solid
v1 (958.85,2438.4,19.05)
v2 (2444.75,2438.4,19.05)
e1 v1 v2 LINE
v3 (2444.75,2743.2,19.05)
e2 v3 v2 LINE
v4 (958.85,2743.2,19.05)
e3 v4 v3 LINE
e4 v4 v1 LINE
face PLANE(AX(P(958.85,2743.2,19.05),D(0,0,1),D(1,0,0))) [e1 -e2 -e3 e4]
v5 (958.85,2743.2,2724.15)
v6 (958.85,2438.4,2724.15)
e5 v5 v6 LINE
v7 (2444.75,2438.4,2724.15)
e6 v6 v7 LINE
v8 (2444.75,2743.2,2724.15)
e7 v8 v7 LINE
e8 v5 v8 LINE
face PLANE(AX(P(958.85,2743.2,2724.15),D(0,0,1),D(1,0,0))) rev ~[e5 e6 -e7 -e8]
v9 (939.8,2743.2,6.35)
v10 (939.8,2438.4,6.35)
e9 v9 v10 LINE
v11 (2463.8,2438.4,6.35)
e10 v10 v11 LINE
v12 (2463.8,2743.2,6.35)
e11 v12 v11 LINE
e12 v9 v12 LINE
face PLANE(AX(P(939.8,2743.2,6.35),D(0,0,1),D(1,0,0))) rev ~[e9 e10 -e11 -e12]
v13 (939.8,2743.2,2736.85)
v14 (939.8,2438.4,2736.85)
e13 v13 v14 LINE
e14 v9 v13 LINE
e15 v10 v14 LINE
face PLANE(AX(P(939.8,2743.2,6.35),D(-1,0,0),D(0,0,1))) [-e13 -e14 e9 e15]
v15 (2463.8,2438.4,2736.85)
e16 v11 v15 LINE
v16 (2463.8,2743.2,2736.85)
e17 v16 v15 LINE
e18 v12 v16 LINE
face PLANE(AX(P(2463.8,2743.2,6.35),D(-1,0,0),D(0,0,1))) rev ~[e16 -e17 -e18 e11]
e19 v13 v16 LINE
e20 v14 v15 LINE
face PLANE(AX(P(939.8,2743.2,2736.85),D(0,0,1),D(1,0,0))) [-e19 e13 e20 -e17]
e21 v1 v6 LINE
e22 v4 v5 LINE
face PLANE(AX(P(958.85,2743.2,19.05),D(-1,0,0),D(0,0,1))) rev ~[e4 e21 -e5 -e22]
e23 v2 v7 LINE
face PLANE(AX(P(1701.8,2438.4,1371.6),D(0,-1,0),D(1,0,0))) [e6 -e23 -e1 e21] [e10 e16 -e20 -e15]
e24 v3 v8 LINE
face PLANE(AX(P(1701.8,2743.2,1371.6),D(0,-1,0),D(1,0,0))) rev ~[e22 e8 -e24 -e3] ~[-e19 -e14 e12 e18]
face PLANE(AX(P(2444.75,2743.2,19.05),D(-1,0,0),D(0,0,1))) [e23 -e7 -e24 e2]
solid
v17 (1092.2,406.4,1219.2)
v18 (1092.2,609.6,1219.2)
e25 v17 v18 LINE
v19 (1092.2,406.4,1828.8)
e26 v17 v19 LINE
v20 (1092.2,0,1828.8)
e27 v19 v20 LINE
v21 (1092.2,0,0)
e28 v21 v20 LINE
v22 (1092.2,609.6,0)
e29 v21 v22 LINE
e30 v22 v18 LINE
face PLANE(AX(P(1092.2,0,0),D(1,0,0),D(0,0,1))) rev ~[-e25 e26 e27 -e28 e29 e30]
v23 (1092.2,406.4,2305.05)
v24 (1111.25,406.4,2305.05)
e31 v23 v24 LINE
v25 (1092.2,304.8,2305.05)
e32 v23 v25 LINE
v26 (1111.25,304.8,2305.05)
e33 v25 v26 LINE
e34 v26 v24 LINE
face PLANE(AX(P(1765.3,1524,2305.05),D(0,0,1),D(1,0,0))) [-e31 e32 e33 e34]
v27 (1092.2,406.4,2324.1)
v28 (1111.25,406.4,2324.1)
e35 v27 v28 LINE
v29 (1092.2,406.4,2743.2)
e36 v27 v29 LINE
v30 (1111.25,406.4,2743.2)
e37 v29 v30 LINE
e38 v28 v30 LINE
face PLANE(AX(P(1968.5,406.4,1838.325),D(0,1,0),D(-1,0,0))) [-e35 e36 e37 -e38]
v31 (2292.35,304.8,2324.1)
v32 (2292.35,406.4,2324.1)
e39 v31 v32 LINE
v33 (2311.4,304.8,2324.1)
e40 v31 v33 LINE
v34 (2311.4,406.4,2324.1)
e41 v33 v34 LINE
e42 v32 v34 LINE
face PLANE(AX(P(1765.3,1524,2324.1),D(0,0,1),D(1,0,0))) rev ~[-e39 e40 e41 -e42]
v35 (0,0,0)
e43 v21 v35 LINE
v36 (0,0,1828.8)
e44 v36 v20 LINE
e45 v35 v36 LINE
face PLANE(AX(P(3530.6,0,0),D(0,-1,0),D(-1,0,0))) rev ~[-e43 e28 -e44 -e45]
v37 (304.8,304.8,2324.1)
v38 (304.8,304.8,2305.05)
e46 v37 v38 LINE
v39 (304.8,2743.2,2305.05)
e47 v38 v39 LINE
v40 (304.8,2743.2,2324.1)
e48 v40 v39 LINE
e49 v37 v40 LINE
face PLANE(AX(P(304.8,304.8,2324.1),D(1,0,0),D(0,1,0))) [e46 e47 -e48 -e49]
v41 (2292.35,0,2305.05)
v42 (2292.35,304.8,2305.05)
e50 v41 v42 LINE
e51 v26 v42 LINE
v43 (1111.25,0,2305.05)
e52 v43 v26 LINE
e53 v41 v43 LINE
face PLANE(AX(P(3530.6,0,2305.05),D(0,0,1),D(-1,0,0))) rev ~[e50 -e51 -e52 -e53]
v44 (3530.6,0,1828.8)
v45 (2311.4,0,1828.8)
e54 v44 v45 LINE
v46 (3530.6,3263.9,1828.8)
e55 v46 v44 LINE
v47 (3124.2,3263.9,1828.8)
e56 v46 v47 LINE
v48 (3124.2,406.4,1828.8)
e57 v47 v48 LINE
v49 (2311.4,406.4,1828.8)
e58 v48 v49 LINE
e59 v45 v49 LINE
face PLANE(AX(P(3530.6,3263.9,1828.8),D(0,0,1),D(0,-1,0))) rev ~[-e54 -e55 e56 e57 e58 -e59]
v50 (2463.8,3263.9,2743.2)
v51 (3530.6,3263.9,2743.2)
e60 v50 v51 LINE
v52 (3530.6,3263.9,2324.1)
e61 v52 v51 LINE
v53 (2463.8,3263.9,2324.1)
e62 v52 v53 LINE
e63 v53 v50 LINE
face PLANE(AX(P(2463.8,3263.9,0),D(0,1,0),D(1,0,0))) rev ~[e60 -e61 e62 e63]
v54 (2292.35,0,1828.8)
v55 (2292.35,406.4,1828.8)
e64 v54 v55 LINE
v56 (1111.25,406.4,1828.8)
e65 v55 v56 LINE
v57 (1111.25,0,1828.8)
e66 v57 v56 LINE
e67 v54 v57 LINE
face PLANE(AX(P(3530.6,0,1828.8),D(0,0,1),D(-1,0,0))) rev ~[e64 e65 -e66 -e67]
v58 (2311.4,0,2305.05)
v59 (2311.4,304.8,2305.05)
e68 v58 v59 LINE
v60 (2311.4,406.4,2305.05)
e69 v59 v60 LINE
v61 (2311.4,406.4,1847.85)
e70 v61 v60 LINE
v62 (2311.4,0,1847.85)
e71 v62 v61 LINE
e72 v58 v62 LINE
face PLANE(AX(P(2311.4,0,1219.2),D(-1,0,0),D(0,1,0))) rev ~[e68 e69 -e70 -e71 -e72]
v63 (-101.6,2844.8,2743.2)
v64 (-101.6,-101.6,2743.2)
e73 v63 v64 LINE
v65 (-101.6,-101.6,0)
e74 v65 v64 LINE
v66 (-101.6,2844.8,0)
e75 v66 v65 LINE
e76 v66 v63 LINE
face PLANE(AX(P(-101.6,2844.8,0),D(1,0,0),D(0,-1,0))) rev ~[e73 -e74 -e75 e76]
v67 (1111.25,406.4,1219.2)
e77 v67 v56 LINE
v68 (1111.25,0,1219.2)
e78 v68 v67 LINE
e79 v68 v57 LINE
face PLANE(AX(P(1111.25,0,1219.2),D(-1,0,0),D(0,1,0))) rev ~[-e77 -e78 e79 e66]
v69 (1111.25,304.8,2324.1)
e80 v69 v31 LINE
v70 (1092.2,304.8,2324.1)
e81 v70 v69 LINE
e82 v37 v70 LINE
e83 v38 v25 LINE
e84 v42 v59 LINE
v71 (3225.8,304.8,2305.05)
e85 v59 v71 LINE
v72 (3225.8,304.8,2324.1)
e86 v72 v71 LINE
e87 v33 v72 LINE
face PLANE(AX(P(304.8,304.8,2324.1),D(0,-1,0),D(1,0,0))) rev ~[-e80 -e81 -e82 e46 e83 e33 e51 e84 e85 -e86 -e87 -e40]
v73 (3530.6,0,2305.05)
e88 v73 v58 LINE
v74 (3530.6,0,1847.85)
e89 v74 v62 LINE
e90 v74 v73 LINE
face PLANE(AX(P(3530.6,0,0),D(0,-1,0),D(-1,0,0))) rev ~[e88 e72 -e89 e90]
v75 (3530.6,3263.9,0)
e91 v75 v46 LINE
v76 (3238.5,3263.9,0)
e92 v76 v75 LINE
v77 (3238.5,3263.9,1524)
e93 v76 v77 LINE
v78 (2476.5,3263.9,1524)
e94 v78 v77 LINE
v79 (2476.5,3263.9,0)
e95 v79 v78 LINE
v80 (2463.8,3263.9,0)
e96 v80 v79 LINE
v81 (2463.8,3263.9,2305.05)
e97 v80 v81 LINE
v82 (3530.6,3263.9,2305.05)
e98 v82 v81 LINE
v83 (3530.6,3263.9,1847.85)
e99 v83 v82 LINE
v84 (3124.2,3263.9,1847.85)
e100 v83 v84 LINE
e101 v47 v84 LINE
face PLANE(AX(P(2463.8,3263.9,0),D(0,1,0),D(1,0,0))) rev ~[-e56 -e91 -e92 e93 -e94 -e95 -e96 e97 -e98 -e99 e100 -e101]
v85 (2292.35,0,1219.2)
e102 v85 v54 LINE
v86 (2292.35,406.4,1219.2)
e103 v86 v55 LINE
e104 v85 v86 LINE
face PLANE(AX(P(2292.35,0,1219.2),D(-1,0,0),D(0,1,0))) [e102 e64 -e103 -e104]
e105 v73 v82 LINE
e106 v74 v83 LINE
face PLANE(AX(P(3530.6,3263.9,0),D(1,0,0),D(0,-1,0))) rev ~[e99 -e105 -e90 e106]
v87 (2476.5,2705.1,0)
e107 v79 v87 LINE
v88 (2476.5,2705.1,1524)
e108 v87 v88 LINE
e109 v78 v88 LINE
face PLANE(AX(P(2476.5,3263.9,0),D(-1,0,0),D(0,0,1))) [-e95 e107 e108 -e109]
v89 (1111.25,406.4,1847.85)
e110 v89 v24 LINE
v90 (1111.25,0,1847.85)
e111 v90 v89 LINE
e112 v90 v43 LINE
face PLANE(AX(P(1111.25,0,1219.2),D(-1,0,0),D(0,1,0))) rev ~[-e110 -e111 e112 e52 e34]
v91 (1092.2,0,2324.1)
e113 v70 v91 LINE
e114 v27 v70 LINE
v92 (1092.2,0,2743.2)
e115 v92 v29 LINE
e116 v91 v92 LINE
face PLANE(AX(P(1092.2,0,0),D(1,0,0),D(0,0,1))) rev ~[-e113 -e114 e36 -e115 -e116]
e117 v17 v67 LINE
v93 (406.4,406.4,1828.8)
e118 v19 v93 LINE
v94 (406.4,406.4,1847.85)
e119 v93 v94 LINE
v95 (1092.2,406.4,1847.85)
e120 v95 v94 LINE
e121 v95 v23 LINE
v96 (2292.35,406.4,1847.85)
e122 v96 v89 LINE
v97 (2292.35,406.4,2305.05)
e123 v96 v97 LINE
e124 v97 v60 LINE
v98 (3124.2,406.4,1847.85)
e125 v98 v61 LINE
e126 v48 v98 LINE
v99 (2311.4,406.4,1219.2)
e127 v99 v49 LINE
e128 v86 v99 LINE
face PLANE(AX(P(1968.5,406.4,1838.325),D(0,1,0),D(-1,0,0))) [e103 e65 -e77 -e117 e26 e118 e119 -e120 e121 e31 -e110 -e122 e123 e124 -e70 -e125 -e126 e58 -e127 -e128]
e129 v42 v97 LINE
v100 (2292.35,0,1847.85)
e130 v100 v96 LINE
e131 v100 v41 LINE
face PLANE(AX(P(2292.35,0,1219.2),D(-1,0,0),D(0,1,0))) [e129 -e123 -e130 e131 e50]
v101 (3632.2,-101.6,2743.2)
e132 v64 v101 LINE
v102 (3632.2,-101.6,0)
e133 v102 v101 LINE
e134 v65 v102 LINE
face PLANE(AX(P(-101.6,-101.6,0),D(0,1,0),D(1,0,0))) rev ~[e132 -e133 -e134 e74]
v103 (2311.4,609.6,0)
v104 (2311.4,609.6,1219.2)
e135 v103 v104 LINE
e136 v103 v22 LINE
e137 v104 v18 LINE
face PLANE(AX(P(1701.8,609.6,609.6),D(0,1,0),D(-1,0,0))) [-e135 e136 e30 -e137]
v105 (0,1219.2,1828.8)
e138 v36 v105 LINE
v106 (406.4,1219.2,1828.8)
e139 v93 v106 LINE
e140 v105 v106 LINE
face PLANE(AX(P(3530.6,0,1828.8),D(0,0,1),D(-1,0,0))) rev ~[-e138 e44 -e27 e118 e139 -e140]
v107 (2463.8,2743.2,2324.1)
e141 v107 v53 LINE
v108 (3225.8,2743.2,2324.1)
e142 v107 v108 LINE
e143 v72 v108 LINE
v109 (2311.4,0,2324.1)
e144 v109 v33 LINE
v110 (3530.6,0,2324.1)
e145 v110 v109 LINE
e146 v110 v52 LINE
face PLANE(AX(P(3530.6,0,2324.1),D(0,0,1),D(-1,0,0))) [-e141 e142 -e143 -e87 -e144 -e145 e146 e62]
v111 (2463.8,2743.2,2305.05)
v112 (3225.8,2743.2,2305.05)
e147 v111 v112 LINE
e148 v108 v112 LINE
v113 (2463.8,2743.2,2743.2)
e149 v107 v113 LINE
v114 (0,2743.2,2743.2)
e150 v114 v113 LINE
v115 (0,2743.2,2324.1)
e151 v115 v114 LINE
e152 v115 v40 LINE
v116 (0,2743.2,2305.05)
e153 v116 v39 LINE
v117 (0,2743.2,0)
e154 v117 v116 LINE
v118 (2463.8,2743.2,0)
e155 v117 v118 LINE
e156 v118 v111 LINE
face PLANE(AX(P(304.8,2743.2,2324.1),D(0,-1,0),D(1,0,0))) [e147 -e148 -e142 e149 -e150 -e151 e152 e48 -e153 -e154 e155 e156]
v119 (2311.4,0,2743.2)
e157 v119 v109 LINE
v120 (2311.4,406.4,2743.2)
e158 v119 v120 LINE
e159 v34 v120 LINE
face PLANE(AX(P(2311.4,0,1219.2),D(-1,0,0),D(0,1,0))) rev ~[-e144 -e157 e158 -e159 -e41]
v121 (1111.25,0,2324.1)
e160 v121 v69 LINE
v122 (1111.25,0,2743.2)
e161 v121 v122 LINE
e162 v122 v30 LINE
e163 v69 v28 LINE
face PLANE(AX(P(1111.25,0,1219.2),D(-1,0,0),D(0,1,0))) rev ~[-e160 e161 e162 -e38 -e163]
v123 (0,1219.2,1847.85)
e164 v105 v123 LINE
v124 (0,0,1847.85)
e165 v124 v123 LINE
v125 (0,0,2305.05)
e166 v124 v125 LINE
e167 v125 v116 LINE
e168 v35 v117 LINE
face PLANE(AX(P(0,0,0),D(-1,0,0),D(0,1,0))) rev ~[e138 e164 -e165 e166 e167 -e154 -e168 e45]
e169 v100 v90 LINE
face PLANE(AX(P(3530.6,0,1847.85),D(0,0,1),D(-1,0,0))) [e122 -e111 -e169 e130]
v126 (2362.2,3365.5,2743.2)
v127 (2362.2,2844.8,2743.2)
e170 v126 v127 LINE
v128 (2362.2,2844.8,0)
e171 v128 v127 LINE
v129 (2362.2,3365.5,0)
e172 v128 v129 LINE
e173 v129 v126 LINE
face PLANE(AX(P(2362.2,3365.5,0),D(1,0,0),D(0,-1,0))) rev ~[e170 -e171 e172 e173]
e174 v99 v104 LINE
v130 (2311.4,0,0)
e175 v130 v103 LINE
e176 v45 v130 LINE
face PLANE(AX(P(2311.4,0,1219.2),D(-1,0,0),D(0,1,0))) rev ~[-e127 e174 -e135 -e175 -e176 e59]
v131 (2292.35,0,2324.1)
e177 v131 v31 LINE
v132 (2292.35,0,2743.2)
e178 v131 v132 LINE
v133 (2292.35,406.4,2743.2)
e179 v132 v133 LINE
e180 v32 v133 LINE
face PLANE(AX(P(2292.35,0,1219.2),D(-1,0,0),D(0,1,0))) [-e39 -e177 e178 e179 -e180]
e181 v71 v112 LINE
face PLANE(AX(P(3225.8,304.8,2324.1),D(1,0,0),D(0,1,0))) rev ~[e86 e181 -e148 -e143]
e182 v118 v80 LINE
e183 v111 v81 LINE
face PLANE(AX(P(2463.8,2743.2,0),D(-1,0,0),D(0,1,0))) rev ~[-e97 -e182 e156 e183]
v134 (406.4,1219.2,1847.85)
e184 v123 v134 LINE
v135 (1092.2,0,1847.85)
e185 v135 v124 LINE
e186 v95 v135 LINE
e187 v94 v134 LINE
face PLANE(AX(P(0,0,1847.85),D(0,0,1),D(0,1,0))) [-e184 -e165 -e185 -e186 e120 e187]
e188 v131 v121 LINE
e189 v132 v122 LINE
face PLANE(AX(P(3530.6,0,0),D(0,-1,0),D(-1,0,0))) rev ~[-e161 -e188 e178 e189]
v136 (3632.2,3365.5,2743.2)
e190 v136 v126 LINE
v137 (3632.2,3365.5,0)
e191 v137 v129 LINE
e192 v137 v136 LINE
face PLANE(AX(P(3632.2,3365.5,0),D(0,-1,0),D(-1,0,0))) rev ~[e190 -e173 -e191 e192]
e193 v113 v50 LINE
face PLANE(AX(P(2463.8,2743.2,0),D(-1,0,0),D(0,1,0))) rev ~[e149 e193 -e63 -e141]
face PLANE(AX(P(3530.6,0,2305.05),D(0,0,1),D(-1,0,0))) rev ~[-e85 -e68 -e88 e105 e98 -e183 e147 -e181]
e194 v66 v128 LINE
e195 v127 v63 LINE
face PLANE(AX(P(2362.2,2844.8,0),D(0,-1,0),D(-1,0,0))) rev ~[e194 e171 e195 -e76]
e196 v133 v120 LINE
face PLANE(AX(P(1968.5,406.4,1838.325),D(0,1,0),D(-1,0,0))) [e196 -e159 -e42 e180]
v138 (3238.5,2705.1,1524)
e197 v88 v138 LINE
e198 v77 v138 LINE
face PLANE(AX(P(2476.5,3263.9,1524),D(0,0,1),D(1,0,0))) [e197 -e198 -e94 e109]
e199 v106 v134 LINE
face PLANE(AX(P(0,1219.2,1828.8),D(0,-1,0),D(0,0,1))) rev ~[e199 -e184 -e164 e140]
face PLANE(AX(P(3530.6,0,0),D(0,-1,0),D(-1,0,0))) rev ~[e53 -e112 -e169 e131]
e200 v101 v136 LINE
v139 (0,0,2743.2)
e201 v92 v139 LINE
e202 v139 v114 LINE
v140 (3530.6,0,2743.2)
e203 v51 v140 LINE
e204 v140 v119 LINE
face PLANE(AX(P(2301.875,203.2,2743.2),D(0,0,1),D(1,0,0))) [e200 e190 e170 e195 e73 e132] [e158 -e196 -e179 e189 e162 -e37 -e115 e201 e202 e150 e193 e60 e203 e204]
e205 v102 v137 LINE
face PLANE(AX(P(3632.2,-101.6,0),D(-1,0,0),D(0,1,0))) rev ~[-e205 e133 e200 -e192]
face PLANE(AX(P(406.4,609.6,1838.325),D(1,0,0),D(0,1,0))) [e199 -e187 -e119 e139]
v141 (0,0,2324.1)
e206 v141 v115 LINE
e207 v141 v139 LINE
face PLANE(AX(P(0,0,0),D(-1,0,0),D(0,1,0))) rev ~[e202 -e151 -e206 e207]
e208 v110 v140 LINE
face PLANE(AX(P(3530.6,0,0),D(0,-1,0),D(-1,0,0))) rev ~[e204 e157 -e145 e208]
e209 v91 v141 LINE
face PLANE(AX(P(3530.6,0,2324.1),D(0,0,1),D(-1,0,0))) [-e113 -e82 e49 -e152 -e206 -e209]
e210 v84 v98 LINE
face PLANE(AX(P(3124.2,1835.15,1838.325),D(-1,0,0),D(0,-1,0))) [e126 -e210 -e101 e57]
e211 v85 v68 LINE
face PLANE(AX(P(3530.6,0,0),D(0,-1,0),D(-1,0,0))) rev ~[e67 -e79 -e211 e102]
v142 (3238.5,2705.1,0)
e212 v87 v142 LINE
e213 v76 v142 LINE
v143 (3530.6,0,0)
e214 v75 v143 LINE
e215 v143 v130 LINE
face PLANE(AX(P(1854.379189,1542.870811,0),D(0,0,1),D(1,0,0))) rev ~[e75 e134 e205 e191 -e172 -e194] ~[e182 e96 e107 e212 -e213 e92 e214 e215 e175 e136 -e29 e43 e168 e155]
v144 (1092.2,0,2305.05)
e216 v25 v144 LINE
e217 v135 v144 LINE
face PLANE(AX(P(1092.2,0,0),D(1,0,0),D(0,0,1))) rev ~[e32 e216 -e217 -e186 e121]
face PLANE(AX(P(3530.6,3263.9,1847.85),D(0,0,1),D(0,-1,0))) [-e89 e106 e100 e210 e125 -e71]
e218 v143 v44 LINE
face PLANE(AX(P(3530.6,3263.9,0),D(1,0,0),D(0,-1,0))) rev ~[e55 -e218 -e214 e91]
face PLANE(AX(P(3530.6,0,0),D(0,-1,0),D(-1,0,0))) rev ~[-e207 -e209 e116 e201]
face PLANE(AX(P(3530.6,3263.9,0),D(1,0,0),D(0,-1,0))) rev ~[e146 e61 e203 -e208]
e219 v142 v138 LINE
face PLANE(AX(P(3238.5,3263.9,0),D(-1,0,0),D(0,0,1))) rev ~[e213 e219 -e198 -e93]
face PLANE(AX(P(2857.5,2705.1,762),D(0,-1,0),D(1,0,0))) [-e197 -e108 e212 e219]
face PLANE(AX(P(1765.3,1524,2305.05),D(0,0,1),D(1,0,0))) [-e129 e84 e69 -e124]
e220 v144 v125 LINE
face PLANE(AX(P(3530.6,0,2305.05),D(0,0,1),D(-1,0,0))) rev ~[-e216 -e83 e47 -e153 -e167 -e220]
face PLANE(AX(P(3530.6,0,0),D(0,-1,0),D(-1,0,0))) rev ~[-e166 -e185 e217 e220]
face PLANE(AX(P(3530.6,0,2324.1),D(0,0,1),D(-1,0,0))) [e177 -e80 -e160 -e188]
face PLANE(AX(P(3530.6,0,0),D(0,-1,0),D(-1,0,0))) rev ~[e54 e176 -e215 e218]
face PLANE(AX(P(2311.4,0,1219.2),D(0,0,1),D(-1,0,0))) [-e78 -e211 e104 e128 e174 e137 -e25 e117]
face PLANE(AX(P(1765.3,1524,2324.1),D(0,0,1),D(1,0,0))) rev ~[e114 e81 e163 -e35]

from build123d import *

# Parameters (mm, degrees)
F1_DEPTH  = 2743.2
F2_W      = 762
F2_H      = 1524
F3_DEPTH  = 558.8
F4_W      = 1524
F4_H      = 2730.5
F4_W_2    = 1485.9
F4_H_2    = 2705.1
F5_DEPTH  = 304.8
F6_W      = 1219.2
F6_H      = 19.05
F7_DEPTH  = 406.4
F8_W      = 1219.2
F8_H      = 1219.2
F9_DEPTH  = 609.6
F10_W     = 19.05
F10_H     = 406.4
F11_DEPTH = 1524
F12_W     = 3124.2
F12_H     = 19.05
F13_DEPTH = 406.4
F14_W     = 2857.5
F14_H     = 19.05
F15_DEPTH = 406.4
F16_W     = 3530.6
F16_H     = 19.05
F17_DEPTH = 3263.9
F18_W     = 2921
F18_H     = 2438.4
F19_DEPTH = 19.05
F20_W     = 2362.2
F20_H     = 419.1000000008
F21_DEPTH = 2324.101


with BuildPart() as f1:
    # F0 (on Top) → F1 (new body)
    with BuildSketch(Plane.XY):
        Polygon((2362.2, 3365.5), (2362.2, 2844.8), (-101.6, 2844.8), (-101.6, -101.6), (3632.2, -101.6), (3632.2, 3365.5), align=None)
        Polygon((3530.6, 0), (0, 0), (0, 2743.2), (2463.8, 2743.2), (2463.8, 3263.9), (3530.6, 3263.9), align=None, mode=Mode.SUBTRACT)
    extrude(amount=F1_DEPTH)

    # F2 (on face) → F3 (join)
    with BuildSketch(Plane.XZ.offset(-3263.9)):
        with Locations((2857.5, 762)):
            Rectangle(F2_W, F2_H)
    extrude(amount=F3_DEPTH)

    # F6 (on face) → F7 (join)
    with BuildSketch(Plane.YZ):
        with Locations((609.6, 1838.325)):
            Rectangle(F6_W, F6_H)
    extrude(amount=F7_DEPTH)

    # F8 (on face) → F9 (join)
    with BuildSketch(Plane(origin=(0, 0, 0), x_dir=(-1, 0, 0), z_dir=(0, 1, 0))):
        with Locations((-1701.8, 609.6)):
            Rectangle(F8_W, F8_H)
    extrude(amount=F9_DEPTH)

    # F10 (on face) → F11 (join)
    with BuildSketch(Plane.XY.offset(1219.2)):
        with Locations((2301.875, 203.2)):
            Rectangle(F10_W, F10_H)
        with Locations((1101.725, 203.2)):
            Rectangle(F10_W, F10_H)
    extrude(amount=F11_DEPTH)

    # F12 (on face) → F13 (join)
    with BuildSketch(Plane(origin=(0, 0, 0), x_dir=(-1, 0, 0), z_dir=(0, 1, 0))):
        with Locations((-1968.5, 1838.325)):
            Rectangle(F12_W, F12_H)
    extrude(amount=F13_DEPTH)

    # F14 (on face) → F15 (join)
    with BuildSketch(Plane(origin=(3530.6, 0, 0), x_dir=(0, -1, 0), z_dir=(-1, 0, 0))):
        with Locations((-1835.15, 1838.325)):
            Rectangle(F14_W, F14_H)
    extrude(amount=F15_DEPTH)

    # F16 (on face) → F17 (join, through all)
    with BuildSketch(Plane(origin=(0, 0, 0), x_dir=(-1, 0, 0), z_dir=(0, 1, 0))):
        with Locations((-1765.3, 2314.575)):
            Rectangle(F16_W, F16_H)
    extrude(amount=F17_DEPTH)

    # F18 (on face) → F19 (cut)
    with BuildSketch(Plane.XY.offset(2324.1)):
        with Locations((1765.3, 1524)):
            Rectangle(F18_W, F18_H)
    extrude(amount=-F19_DEPTH, mode=Mode.SUBTRACT)

    # F20 (on face) → F21 (cut, through all)
    with BuildSketch(Plane.XY.offset(2324.1)):
        with Locations((1181.1, 3054.3500000004)):
            Rectangle(F20_W, F20_H)
    extrude(amount=-F21_DEPTH, mode=Mode.SUBTRACT)


with BuildPart() as f5:
    # F4 (on face) → F5 (new body)
    with BuildSketch(Plane.XZ.offset(-2743.2)):
        with Locations((1701.8, 1371.6)):
            Rectangle(F4_W, F4_H)
        with Locations((1701.8, 1371.6)):
            Rectangle(F4_W_2, F4_H_2, mode=Mode.SUBTRACT)
    extrude(amount=F5_DEPTH)


solid = Compound([f1.part, f5.part])
